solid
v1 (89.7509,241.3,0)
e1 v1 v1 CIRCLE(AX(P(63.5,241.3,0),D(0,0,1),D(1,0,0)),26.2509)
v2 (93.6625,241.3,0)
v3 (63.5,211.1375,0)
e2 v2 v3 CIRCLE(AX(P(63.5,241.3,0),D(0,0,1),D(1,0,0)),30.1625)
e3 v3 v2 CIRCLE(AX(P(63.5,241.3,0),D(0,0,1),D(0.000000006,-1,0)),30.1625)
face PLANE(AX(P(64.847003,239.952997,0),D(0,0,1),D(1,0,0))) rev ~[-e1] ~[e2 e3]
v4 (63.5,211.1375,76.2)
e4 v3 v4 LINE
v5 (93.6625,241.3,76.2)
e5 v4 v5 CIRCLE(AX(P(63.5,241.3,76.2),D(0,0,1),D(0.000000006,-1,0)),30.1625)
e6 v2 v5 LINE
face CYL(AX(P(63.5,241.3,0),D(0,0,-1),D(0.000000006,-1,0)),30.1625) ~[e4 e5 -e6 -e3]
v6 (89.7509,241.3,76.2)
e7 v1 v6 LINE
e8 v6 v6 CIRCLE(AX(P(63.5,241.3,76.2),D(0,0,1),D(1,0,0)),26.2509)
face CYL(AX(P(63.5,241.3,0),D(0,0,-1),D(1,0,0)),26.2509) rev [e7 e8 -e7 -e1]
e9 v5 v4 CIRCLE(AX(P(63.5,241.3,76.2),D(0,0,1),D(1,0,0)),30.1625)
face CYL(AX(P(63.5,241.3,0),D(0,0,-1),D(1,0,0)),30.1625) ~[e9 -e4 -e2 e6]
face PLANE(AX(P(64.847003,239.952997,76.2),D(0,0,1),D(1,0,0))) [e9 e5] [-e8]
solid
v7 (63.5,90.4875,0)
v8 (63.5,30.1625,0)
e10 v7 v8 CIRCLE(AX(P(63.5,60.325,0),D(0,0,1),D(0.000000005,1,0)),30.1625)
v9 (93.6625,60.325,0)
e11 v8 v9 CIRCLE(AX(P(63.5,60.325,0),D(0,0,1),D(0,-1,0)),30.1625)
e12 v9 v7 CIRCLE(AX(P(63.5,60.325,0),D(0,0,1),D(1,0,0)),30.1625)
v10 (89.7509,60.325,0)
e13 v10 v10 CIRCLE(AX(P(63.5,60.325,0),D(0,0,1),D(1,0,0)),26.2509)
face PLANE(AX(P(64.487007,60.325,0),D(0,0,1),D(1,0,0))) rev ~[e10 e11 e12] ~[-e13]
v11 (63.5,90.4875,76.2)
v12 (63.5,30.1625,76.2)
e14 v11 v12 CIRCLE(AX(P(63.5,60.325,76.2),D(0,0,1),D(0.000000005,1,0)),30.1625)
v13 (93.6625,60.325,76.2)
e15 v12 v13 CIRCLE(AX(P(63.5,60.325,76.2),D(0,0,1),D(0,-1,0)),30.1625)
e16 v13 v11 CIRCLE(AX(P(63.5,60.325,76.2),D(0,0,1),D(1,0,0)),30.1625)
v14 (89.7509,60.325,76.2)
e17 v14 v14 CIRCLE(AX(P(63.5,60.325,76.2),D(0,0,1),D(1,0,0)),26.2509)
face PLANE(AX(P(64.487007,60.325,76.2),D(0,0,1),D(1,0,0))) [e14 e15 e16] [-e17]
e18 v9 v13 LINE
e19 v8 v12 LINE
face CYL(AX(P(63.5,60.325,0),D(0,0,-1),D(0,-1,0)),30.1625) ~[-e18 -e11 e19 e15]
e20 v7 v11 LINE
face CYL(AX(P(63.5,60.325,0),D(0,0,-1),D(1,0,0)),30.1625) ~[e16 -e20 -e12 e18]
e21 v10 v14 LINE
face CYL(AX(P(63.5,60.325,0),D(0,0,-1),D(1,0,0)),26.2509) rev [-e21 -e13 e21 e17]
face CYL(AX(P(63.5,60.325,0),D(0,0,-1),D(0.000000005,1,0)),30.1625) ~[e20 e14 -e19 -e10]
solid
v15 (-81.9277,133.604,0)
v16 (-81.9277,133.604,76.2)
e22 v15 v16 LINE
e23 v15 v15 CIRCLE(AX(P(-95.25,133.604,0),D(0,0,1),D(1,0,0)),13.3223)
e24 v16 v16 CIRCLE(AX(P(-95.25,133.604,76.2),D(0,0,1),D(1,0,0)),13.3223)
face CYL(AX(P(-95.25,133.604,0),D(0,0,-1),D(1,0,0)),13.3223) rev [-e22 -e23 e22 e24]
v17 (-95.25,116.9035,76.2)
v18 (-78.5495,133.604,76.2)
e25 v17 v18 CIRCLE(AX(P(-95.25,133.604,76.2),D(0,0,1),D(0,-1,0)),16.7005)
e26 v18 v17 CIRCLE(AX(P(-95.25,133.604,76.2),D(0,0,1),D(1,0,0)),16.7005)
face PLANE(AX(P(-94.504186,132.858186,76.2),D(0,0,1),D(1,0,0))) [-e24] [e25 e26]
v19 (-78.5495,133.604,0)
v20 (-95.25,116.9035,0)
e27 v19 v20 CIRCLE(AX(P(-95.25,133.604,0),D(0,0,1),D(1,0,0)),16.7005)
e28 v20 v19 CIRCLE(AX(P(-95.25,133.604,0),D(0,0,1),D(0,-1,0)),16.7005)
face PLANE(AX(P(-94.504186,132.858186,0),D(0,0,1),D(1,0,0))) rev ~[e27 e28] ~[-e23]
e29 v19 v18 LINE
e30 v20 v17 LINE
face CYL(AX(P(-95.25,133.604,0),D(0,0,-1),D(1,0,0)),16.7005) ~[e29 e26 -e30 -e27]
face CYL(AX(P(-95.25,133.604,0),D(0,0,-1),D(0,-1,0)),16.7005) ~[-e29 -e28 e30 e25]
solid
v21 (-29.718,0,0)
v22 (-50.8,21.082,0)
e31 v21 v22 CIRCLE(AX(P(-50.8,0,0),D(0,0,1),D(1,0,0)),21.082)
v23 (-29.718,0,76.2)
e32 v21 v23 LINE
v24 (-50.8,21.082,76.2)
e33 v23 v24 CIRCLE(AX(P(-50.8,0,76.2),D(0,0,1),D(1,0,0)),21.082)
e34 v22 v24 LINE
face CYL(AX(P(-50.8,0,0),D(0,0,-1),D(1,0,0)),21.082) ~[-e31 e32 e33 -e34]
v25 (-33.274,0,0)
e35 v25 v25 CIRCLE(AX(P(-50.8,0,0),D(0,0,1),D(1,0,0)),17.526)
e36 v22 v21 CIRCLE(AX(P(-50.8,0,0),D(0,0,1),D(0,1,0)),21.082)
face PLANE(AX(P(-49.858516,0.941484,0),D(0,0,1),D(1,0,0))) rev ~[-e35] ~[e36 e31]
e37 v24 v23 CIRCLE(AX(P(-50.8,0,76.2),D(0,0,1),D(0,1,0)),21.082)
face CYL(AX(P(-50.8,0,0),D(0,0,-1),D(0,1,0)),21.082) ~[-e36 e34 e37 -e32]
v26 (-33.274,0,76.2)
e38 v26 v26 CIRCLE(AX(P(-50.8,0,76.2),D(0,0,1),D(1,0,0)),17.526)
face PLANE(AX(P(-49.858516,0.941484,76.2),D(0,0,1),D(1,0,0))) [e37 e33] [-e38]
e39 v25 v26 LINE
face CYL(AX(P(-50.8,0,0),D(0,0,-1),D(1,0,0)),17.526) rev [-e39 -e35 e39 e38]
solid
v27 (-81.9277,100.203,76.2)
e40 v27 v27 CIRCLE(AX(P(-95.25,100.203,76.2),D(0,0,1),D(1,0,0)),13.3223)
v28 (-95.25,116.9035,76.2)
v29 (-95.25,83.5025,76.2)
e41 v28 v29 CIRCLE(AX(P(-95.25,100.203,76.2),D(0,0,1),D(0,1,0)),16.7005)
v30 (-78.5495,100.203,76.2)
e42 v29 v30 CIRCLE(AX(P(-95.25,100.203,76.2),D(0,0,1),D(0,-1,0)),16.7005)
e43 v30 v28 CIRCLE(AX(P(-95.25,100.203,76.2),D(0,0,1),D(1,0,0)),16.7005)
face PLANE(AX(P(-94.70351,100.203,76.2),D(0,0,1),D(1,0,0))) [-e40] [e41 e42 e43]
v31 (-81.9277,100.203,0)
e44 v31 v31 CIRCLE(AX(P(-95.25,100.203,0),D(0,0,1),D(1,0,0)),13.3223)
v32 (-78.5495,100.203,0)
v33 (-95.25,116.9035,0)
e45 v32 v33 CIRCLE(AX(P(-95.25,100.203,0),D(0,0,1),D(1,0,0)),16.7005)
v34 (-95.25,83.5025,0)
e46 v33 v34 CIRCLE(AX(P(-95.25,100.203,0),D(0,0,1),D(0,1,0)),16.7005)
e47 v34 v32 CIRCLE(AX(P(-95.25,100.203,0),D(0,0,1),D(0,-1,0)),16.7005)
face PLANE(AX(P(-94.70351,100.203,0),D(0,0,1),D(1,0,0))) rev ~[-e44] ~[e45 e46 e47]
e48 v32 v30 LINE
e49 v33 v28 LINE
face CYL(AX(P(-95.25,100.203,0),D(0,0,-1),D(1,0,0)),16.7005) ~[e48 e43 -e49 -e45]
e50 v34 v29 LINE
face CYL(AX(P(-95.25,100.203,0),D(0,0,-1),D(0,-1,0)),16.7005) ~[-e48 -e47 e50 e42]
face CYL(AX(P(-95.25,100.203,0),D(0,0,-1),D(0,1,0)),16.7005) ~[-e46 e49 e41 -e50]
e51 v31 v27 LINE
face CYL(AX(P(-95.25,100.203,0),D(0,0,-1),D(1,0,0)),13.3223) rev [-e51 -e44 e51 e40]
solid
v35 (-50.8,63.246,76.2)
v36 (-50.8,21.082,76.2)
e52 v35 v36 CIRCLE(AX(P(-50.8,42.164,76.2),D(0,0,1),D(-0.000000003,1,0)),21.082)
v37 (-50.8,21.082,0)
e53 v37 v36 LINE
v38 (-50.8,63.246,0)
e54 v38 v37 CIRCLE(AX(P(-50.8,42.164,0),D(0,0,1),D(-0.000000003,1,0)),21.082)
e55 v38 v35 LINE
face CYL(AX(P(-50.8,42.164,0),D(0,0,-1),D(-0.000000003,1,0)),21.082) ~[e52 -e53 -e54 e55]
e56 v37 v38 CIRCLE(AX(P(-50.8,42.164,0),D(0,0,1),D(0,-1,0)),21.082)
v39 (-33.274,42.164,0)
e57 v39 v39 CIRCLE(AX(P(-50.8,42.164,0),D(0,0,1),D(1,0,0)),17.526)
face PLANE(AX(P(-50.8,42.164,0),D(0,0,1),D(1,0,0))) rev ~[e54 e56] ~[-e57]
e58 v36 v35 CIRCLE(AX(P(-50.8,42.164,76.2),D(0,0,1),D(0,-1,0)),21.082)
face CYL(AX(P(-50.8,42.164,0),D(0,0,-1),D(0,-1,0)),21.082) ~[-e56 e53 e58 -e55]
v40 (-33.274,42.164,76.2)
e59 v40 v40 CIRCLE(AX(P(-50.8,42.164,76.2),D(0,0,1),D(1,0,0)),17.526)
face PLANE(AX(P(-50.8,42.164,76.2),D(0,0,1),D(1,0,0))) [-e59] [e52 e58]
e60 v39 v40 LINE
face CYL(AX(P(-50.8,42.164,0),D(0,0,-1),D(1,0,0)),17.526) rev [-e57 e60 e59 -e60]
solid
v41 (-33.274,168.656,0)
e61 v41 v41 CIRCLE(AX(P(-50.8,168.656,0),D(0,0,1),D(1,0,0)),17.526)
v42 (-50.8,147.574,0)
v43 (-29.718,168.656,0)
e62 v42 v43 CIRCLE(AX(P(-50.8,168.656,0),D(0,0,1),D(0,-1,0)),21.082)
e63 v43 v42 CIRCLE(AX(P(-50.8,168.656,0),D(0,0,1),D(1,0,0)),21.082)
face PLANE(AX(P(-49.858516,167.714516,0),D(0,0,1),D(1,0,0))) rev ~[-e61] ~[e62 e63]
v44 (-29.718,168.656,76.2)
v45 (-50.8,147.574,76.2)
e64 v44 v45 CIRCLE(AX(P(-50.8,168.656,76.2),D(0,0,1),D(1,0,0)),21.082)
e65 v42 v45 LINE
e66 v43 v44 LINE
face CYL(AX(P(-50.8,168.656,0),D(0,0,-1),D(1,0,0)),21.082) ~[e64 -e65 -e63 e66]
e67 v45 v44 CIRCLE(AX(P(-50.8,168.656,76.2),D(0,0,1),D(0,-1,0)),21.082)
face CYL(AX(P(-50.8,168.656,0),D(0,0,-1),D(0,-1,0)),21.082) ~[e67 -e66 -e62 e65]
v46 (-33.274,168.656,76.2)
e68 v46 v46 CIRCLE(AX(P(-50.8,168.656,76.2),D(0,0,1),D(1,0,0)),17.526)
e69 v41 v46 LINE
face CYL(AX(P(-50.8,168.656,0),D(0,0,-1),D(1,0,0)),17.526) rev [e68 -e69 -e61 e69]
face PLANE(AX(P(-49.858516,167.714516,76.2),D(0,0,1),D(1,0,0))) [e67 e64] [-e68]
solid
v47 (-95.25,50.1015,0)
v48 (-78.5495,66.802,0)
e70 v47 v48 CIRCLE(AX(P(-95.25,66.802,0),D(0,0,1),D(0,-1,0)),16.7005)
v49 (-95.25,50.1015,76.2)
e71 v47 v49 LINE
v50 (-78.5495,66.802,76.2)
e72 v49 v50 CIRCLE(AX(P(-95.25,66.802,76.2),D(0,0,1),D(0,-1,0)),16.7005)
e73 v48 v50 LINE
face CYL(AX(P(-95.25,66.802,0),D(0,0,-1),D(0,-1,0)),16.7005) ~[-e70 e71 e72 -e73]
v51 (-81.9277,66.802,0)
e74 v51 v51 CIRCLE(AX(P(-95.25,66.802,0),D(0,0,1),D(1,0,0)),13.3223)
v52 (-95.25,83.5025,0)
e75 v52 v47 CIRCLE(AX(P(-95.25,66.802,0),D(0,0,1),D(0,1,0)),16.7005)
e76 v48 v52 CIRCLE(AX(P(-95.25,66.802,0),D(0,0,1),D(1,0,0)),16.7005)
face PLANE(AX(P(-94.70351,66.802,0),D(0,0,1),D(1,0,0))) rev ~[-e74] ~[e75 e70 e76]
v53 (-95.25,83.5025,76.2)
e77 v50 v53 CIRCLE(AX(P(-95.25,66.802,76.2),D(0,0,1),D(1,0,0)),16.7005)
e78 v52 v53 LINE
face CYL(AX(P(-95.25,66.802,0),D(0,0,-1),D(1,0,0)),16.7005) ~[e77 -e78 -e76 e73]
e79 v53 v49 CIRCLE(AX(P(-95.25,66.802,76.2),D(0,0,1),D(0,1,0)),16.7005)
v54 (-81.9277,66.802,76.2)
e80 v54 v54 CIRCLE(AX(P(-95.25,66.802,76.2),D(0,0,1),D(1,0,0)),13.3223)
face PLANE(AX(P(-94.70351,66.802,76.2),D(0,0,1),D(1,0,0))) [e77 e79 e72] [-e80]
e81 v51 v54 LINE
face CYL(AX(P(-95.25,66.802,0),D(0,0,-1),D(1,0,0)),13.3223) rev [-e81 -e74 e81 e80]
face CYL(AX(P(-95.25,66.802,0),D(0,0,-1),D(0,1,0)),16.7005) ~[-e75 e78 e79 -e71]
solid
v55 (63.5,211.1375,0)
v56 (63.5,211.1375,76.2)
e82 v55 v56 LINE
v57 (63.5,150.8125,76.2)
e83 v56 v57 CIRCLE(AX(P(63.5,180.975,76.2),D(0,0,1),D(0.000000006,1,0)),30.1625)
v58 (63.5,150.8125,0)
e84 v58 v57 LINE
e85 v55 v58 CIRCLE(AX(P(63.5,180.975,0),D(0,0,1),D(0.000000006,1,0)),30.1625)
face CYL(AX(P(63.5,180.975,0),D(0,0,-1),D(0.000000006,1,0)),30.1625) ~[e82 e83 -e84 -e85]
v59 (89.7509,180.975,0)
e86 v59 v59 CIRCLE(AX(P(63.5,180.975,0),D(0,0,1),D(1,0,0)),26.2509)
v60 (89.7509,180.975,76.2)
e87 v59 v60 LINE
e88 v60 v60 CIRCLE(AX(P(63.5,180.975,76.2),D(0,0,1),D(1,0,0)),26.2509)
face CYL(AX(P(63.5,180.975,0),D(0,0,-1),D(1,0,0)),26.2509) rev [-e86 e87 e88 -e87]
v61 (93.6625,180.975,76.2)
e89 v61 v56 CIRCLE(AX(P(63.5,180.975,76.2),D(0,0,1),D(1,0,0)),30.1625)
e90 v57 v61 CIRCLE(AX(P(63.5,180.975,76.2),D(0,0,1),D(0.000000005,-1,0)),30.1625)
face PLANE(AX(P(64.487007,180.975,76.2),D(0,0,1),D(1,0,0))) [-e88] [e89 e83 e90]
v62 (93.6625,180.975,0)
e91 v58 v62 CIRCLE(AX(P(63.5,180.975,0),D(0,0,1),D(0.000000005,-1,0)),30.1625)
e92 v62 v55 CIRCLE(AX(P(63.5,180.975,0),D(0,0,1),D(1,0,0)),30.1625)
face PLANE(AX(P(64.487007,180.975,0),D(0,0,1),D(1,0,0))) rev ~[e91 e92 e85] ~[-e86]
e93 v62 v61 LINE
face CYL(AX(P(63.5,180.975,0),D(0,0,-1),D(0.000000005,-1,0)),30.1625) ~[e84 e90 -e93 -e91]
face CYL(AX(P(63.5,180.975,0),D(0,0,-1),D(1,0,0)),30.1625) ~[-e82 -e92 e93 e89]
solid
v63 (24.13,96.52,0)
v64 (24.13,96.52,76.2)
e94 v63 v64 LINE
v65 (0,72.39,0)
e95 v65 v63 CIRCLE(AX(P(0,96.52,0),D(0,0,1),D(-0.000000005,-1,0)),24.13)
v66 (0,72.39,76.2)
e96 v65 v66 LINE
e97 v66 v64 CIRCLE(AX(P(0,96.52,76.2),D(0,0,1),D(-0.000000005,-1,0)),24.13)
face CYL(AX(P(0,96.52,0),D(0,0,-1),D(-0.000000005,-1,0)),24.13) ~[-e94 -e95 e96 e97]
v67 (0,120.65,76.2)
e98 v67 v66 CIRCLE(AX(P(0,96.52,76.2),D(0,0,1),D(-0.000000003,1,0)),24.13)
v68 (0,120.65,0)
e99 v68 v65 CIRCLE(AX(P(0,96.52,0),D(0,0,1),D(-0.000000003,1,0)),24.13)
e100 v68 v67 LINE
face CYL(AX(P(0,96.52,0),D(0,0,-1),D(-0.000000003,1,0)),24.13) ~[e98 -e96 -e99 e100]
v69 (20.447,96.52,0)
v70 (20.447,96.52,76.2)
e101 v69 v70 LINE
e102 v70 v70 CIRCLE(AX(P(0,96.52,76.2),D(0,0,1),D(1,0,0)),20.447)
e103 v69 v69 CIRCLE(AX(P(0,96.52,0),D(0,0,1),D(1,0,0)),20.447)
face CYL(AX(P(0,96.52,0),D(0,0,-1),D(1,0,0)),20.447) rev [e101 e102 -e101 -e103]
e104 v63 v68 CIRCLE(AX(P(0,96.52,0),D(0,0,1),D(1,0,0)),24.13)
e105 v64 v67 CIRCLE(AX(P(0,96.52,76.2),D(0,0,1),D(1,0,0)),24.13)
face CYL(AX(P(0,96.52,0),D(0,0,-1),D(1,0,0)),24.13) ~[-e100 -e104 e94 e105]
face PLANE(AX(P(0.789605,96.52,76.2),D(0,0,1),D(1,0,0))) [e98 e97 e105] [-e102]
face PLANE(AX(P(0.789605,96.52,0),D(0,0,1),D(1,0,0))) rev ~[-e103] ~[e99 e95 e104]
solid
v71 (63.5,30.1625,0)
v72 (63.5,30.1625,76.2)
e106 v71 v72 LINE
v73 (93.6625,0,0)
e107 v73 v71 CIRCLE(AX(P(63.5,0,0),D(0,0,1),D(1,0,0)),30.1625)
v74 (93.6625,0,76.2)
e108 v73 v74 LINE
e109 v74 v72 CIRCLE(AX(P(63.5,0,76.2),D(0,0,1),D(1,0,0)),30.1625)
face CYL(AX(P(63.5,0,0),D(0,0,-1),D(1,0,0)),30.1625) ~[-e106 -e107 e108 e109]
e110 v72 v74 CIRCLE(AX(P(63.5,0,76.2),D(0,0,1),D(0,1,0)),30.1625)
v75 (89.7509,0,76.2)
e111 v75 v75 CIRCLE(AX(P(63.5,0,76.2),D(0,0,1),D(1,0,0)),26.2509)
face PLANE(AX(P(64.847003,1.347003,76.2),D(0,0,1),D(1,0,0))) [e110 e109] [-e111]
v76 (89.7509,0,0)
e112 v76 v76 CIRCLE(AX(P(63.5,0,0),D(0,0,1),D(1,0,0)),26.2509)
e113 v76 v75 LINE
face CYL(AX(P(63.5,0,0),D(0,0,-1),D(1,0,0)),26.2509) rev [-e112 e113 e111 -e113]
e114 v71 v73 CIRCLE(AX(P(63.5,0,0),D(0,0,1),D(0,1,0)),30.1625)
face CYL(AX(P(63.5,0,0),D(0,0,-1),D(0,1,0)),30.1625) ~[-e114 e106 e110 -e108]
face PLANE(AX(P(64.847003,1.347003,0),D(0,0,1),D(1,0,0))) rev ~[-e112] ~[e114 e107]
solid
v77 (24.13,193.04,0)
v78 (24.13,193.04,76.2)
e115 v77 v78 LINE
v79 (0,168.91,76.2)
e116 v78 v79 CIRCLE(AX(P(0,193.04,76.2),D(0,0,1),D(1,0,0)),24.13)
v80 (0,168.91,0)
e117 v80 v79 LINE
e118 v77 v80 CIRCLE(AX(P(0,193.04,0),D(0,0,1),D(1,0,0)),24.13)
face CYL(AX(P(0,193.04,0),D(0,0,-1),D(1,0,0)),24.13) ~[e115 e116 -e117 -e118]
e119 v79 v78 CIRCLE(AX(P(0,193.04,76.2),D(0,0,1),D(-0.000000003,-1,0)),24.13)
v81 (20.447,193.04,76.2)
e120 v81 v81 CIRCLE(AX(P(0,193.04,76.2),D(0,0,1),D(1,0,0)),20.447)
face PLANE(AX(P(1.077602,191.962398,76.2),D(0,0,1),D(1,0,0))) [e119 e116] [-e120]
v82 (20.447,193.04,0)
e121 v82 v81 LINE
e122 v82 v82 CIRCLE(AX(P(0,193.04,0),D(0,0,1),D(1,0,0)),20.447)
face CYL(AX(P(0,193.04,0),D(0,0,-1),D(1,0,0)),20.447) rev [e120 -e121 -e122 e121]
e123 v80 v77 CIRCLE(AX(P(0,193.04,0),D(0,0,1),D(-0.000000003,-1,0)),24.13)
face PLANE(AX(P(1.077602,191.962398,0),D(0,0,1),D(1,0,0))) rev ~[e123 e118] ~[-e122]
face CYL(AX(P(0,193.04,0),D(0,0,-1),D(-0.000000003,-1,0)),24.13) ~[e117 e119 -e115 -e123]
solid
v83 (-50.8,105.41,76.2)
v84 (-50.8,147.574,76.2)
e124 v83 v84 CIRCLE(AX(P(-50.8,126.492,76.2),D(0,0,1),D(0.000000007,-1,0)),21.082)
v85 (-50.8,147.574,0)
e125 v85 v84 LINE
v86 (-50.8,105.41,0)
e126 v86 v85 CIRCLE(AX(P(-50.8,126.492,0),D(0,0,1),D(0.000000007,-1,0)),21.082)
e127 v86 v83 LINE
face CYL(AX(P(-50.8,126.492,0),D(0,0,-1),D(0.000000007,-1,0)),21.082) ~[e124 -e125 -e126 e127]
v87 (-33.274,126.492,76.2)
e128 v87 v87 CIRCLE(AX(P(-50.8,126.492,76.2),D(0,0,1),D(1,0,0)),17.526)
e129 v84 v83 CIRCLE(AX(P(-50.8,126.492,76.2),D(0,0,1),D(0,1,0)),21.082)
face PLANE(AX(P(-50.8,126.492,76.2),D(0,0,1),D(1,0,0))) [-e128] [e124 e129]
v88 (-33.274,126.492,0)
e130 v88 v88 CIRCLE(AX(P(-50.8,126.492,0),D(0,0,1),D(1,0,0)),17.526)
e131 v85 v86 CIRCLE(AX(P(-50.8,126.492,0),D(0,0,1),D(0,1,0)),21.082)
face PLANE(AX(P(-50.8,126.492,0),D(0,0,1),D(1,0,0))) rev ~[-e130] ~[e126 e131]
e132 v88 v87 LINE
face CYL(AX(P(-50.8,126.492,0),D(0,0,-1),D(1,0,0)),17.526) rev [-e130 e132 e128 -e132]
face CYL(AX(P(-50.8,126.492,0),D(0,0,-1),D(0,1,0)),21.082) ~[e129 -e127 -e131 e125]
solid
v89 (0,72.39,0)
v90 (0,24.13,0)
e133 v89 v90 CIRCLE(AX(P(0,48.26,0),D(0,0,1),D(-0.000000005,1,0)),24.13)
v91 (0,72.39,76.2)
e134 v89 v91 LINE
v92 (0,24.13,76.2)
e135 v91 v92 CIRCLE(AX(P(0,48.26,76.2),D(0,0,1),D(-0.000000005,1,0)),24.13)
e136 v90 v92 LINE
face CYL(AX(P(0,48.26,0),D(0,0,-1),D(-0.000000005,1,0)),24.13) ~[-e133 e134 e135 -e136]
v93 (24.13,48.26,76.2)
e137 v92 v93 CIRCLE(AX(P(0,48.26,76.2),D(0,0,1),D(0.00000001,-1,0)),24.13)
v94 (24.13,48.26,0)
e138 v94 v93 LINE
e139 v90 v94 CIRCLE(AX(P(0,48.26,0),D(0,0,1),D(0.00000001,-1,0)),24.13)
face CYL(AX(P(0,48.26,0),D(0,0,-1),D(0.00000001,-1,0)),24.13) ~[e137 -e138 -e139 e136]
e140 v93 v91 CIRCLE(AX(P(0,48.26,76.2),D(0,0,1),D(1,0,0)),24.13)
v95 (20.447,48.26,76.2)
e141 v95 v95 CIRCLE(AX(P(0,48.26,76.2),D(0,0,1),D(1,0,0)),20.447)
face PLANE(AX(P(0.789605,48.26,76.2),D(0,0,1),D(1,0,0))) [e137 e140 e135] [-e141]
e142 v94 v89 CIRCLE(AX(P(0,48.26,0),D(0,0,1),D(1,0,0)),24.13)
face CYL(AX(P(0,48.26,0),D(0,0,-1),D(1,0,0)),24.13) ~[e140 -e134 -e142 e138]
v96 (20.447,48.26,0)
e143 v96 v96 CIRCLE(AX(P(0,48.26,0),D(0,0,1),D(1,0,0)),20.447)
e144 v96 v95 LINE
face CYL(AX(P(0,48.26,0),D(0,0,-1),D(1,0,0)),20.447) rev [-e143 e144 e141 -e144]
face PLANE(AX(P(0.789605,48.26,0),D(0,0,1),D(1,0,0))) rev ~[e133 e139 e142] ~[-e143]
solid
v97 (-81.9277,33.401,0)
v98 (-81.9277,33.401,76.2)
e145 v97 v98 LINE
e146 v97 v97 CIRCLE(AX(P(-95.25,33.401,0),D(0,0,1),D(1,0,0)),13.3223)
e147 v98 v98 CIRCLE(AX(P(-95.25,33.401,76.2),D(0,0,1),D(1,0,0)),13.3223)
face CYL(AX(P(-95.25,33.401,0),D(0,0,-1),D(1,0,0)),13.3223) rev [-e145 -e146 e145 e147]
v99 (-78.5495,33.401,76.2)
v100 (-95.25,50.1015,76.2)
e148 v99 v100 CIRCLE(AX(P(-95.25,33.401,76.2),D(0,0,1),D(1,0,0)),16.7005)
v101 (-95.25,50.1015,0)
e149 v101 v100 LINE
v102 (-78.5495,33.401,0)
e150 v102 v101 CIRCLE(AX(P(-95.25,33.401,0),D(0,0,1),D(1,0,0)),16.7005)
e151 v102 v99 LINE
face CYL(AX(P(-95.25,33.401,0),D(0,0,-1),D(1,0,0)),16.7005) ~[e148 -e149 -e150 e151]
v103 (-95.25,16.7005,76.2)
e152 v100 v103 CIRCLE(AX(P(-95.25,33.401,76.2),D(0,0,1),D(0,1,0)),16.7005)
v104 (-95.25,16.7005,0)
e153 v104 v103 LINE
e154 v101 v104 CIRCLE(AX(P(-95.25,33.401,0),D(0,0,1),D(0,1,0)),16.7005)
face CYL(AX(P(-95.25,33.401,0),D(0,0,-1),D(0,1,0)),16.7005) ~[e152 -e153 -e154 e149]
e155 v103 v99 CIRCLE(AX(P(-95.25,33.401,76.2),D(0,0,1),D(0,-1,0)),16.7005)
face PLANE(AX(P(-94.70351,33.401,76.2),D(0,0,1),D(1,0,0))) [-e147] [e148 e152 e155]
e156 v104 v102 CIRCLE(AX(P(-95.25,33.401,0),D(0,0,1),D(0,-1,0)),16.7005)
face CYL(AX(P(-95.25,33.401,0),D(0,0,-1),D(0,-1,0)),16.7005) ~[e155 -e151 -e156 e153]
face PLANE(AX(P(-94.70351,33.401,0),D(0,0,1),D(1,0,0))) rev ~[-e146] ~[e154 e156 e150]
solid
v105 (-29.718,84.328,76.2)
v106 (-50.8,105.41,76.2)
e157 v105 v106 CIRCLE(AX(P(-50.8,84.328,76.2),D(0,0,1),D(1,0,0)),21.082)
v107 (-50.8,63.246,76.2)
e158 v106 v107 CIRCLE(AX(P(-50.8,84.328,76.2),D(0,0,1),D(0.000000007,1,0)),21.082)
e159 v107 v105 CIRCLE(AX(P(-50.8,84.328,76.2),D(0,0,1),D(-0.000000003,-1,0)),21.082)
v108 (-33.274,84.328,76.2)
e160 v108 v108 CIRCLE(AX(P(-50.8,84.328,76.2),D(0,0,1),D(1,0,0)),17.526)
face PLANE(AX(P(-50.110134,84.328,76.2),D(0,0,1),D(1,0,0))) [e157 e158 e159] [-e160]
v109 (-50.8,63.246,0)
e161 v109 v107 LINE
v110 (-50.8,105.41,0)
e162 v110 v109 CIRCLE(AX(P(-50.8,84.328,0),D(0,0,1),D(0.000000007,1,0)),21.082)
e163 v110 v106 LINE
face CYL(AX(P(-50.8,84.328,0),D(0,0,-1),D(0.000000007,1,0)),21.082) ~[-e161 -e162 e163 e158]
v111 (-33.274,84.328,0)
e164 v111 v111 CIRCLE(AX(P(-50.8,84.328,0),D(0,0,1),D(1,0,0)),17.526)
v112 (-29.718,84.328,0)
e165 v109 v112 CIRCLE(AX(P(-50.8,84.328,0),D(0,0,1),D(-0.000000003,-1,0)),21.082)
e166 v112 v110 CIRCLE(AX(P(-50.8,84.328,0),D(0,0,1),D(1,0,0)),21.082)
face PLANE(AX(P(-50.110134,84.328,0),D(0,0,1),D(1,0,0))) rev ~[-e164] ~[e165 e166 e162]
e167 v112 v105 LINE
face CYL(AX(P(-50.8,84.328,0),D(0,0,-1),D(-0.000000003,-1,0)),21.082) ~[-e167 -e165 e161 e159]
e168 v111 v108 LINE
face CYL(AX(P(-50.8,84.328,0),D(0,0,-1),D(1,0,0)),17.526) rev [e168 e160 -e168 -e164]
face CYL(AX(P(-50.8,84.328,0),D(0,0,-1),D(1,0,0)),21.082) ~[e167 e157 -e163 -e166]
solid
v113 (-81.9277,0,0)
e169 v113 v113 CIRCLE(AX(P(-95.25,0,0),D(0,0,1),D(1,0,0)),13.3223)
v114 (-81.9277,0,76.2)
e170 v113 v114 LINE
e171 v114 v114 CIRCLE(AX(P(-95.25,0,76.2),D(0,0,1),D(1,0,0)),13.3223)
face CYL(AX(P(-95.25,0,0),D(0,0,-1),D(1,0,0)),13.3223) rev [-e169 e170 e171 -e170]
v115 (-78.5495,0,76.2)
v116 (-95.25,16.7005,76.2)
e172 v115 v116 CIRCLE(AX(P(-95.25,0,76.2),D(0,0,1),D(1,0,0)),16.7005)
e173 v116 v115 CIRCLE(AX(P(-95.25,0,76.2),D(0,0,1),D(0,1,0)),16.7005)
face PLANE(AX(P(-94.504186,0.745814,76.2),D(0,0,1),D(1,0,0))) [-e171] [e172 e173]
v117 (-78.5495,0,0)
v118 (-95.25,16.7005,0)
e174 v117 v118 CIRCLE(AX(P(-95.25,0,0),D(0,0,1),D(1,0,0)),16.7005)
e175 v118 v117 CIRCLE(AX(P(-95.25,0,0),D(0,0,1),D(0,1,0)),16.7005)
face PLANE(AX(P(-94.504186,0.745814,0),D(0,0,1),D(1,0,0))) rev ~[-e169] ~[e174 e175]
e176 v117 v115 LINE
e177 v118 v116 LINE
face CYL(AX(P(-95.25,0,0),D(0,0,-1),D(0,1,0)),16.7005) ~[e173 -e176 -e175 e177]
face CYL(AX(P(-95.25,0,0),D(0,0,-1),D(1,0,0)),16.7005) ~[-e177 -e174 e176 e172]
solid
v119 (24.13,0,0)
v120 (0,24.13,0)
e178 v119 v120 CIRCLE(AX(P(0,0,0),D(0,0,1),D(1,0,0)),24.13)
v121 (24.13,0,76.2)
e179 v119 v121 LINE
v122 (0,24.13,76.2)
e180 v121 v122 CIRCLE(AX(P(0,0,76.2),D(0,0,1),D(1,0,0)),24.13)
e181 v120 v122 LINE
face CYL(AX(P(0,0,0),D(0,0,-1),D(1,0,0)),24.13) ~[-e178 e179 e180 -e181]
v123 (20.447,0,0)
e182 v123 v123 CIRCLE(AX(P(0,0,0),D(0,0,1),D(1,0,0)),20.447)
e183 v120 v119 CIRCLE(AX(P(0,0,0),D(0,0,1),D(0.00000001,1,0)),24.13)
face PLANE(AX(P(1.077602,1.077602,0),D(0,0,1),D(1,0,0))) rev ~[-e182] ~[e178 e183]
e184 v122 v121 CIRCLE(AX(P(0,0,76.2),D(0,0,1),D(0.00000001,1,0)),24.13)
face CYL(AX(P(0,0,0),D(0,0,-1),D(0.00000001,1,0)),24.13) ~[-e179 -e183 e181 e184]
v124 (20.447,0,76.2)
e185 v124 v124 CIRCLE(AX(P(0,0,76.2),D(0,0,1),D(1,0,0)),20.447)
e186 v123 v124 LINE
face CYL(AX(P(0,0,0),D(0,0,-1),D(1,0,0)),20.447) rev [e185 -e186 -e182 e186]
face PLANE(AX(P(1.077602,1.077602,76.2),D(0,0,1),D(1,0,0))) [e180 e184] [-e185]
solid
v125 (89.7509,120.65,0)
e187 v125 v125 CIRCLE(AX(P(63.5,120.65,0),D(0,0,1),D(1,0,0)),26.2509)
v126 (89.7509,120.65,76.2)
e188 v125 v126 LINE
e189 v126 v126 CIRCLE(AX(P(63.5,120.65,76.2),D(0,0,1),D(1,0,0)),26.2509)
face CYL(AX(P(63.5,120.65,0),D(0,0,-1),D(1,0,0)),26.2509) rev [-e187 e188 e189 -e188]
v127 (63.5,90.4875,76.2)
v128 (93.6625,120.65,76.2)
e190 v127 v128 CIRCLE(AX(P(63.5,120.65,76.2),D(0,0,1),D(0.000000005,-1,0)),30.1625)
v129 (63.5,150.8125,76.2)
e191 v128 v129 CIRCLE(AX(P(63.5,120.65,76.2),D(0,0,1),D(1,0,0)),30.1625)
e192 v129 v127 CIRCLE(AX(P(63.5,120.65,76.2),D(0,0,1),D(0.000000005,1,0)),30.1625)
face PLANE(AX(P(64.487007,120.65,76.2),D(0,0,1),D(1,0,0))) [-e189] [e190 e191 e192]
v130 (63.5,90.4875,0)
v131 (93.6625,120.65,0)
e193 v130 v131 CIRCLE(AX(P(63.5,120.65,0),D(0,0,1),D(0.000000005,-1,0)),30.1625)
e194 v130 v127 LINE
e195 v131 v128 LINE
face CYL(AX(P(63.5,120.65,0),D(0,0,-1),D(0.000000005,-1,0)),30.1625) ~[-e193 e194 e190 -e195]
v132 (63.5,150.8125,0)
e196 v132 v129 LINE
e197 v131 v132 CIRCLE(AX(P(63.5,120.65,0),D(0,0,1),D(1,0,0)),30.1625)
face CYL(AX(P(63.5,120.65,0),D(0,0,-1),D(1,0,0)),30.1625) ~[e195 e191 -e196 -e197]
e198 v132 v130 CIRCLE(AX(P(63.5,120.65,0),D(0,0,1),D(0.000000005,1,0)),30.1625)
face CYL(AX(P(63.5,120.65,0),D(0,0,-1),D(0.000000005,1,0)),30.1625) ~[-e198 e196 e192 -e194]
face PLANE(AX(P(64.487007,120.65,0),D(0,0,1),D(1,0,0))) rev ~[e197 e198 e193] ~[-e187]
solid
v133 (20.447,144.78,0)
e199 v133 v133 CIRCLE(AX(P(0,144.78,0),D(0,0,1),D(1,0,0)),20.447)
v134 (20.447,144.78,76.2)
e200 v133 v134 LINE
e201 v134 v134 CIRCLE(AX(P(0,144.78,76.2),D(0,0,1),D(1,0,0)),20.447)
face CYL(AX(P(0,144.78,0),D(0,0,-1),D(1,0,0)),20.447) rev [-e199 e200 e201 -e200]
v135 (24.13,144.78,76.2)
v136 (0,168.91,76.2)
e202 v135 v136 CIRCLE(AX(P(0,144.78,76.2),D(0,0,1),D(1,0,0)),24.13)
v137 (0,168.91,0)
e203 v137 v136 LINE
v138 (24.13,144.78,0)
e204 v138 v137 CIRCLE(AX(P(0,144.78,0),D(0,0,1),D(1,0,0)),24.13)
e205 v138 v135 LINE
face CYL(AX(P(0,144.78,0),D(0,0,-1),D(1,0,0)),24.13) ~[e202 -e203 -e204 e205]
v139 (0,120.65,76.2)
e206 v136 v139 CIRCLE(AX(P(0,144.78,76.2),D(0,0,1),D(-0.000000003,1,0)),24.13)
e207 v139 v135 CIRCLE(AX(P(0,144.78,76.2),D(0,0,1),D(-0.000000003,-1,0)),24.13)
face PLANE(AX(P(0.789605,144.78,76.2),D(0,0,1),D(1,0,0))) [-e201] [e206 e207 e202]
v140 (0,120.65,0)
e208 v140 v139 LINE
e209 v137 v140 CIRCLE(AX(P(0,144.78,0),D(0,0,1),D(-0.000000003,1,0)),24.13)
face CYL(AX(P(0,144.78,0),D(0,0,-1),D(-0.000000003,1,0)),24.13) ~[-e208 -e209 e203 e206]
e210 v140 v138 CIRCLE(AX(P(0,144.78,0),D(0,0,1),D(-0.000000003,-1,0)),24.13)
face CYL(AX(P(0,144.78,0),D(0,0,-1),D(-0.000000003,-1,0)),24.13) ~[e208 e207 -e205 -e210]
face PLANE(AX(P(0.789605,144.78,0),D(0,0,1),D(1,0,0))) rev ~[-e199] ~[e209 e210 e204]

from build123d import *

# Parameters (mm, degrees)
F5_R     = 20.447
F6_DEPTH = 76.2
F5_R_2   = 26.2509
F5_R_3   = 17.526
F5_R_4   = 13.3223


# Not quite as in the source:
# - a variable given as a bare number and used for a length is read in inches; the dataset says mm whatever the document's units were
# - the program builds the solid bodies; features that only make, move or delete a surface that nothing else refers to are left out


with BuildPart() as f6:
    # F5 (on Top) → F6 (new body)
    with BuildSketch(Plane.XY):
        with BuildLine():
            ThreePointArc((2.415e-07, 24.13), (-17.0624867154, -17.0624865447), (24.13, 0))
            ThreePointArc((24.13, 0), (17.0624867154, 17.0624865447), (2.415e-07, 24.13))
        make_face()
        Circle(F5_R, mode=Mode.SUBTRACT)
    extrude(amount=F6_DEPTH)


with BuildPart() as f6b:
    # F5 (on Top) → F6, piece 2 (new body)
    with BuildSketch(Plane.XY):
        with BuildLine():
            ThreePointArc((24.13, 193.04), (-17.0624866044, 210.1024866557), (-7.25e-08, 168.91))
            ThreePointArc((-7.25e-08, 168.91), (17.0624866044, 175.9775133443), (24.13, 193.04))
        make_face()
        with Locations((0, 193.04)):
            Circle(F5_R, mode=Mode.SUBTRACT)
    extrude(amount=F6_DEPTH)


with BuildPart() as f6c:
    # F5 (on Top) → F6, piece 3 (new body)
    with BuildSketch(Plane.XY):
        with BuildLine():
            ThreePointArc((-7.25e-08, 168.91), (-24.13, 144.7800000021), (-7.68e-08, 120.65))
            ThreePointArc((-7.68e-08, 120.65), (17.0624866029, 127.7175133428), (24.13, 144.78))
            ThreePointArc((24.13, 144.78), (17.0624866044, 161.8424866557), (-7.25e-08, 168.91))
        make_face()
        with Locations((0, 144.78)):
            Circle(F5_R, mode=Mode.SUBTRACT)
    extrude(amount=F6_DEPTH)


with BuildPart() as f6d:
    # F5 (on Top) → F6, piece 4 (new body)
    with BuildSketch(Plane.XY):
        with BuildLine():
            ThreePointArc((-7.68e-08, 120.65), (-24.13, 96.5200000237), (-1.242e-07, 72.39))
            ThreePointArc((-1.242e-07, 72.39), (17.0624865861, 79.4575133261), (24.13, 96.52))
            ThreePointArc((24.13, 96.52), (17.0624866029, 113.5824866572), (-7.68e-08, 120.65))
        make_face()
        with Locations((0, 96.52)):
            Circle(F5_R, mode=Mode.SUBTRACT)
    extrude(amount=F6_DEPTH)


with BuildPart() as f6e:
    # F5 (on Top) → F6, piece 5 (new body)
    with BuildSketch(Plane.XY):
        with BuildLine():
            ThreePointArc((-1.242e-07, 72.39), (-24.13, 48.2599998172), (2.415e-07, 24.13))
            ThreePointArc((2.415e-07, 24.13), (17.0624867154, 31.1975134553), (24.13, 48.26))
            ThreePointArc((24.13, 48.26), (17.0624865861, 65.3224866739), (-1.242e-07, 72.39))
        make_face()
        with Locations((0, 48.26)):
            Circle(F5_R, mode=Mode.SUBTRACT)
    extrude(amount=F6_DEPTH)


with BuildPart() as f6f:
    # F5 (on Top) → F6, piece 6 (new body)
    with BuildSketch(Plane.XY):
        with BuildLine():
            ThreePointArc((63.5, 30.1625), (42.1718917125, -21.3281082875), (93.6625, 0))
            ThreePointArc((93.6625, 0), (84.8281082875, 21.3281082875), (63.5, 30.1625))
        make_face()
        with Locations((63.5, 0)):
            Circle(F5_R_2, mode=Mode.SUBTRACT)
    extrude(amount=F6_DEPTH)


with BuildPart() as f6g:
    # F5 (on Top) → F6, piece 7 (new body)
    with BuildSketch(Plane.XY):
        with BuildLine():
            ThreePointArc((93.6625, 241.3), (42.1718916511, 262.6281082262), (63.5000001735, 211.1375))
            ThreePointArc((63.5000001735, 211.1375), (84.8281083489, 219.9718917738), (93.6625, 241.3))
        make_face()
        with Locations((63.5, 241.3)):
            Circle(F5_R_2, mode=Mode.SUBTRACT)
    extrude(amount=F6_DEPTH)


with BuildPart() as f6h:
    # F5 (on Top) → F6, piece 8 (new body)
    with BuildSketch(Plane.XY):
        with BuildLine():
            ThreePointArc((63.5000001735, 211.1375), (33.3375, 180.9750000105), (63.5000001525, 150.8125))
            ThreePointArc((63.5000001525, 150.8125), (84.8281083415, 159.6468917664), (93.6625, 180.975))
            ThreePointArc((93.6625, 180.975), (84.8281083489, 202.3031082262), (63.5000001735, 211.1375))
        make_face()
        with Locations((63.5, 180.975)):
            Circle(F5_R_2, mode=Mode.SUBTRACT)
    extrude(amount=F6_DEPTH)


with BuildPart() as f6i:
    # F5 (on Top) → F6, piece 9 (new body)
    with BuildSketch(Plane.XY):
        with BuildLine():
            ThreePointArc((63.5000001525, 150.8125), (33.3375, 120.6500000068), (63.5000001389, 90.4875))
            ThreePointArc((63.5000001389, 90.4875), (84.8281083366, 99.3218917616), (93.6625, 120.65))
            ThreePointArc((93.6625, 120.65), (84.8281083415, 141.9781082336), (63.5000001525, 150.8125))
        make_face()
        with Locations((63.5, 120.65)):
            Circle(F5_R_2, mode=Mode.SUBTRACT)
    extrude(amount=F6_DEPTH)


with BuildPart() as f6j:
    # F5 (on Top) → F6, piece 10 (new body)
    with BuildSketch(Plane.XY):
        with BuildLine():
            ThreePointArc((63.5000001389, 90.4875), (33.3375, 60.3250000694), (63.5, 30.1625))
            ThreePointArc((63.5, 30.1625), (84.8281082875, 38.9968917125), (93.6625, 60.325))
            ThreePointArc((93.6625, 60.325), (84.8281083366, 81.6531082384), (63.5000001389, 90.4875))
        make_face()
        with Locations((63.5, 60.325)):
            Circle(F5_R_2, mode=Mode.SUBTRACT)
    extrude(amount=F6_DEPTH)


with BuildPart() as f6k:
    # F5 (on Top) → F6, piece 11 (new body)
    with BuildSketch(Plane.XY):
        with BuildLine():
            ThreePointArc((-50.8, 21.082), (-65.707225161, -14.907225161), (-29.718, 0))
            ThreePointArc((-29.718, 0), (-35.892774839, 14.907225161), (-50.8, 21.082))
        make_face()
        with Locations((-50.8, 0)):
            Circle(F5_R_3, mode=Mode.SUBTRACT)
    extrude(amount=F6_DEPTH)


with BuildPart() as f6l:
    # F5 (on Top) → F6, piece 12 (new body)
    with BuildSketch(Plane.XY):
        with BuildLine():
            ThreePointArc((-29.718, 168.656), (-65.707225161, 183.563225161), (-50.8, 147.574))
            ThreePointArc((-50.8, 147.574), (-35.892774839, 153.748774839), (-29.718, 168.656))
        make_face()
        with Locations((-50.8, 168.656)):
            Circle(F5_R_3, mode=Mode.SUBTRACT)
    extrude(amount=F6_DEPTH)


with BuildPart() as f6m:
    # F5 (on Top) → F6, piece 13 (new body)
    with BuildSketch(Plane.XY):
        with BuildLine():
            ThreePointArc((-50.8, 147.574), (-71.882, 126.4919999282), (-50.7999998565, 105.41))
            ThreePointArc((-50.7999998565, 105.41), (-35.8927747883, 111.5847748898), (-29.718, 126.492))
            ThreePointArc((-29.718, 126.492), (-35.892774839, 141.399225161), (-50.8, 147.574))
        make_face()
        with Locations((-50.8, 126.492)):
            Circle(F5_R_3, mode=Mode.SUBTRACT)
    extrude(amount=F6_DEPTH)


with BuildPart() as f6n:
    # F5 (on Top) → F6, piece 14 (new body)
    with BuildSketch(Plane.XY):
        with BuildLine():
            ThreePointArc((-50.7999998565, 105.41), (-71.882, 84.3280001019), (-50.8000000603, 63.246))
            ThreePointArc((-50.8000000603, 63.246), (-35.8927748604, 69.4207748177), (-29.718, 84.328))
            ThreePointArc((-29.718, 84.328), (-35.8927747883, 99.2352251102), (-50.7999998565, 105.41))
        make_face()
        with Locations((-50.8, 84.328)):
            Circle(F5_R_3, mode=Mode.SUBTRACT)
    extrude(amount=F6_DEPTH)


with BuildPart() as f6o:
    # F5 (on Top) → F6, piece 15 (new body)
    with BuildSketch(Plane.XY):
        with BuildLine():
            ThreePointArc((-50.8000000603, 63.246), (-71.882, 42.1639999698), (-50.8, 21.082))
            ThreePointArc((-50.8, 21.082), (-35.892774839, 27.256774839), (-29.718, 42.164))
            ThreePointArc((-29.718, 42.164), (-35.8927748604, 57.0712251823), (-50.8000000603, 63.246))
        make_face()
        with Locations((-50.8, 42.164)):
            Circle(F5_R_3, mode=Mode.SUBTRACT)
    extrude(amount=F6_DEPTH)


with BuildPart() as f6p:
    # F5 (on Top) → F6, piece 16 (new body)
    with BuildSketch(Plane.XY):
        with BuildLine():
            ThreePointArc((-95.25, 16.7005), (-107.0590367992, -11.8090367992), (-78.5495, 0))
            ThreePointArc((-78.5495, 0), (-83.4409632008, 11.8090367992), (-95.25, 16.7005))
        make_face()
        with Locations((-95.25, 0)):
            Circle(F5_R_4, mode=Mode.SUBTRACT)
    extrude(amount=F6_DEPTH)


with BuildPart() as f6q:
    # F5 (on Top) → F6, piece 17 (new body)
    with BuildSketch(Plane.XY):
        with BuildLine():
            ThreePointArc((-78.5495, 133.604), (-107.0590367992, 145.4130367992), (-95.25, 116.9035))
            ThreePointArc((-95.25, 116.9035), (-83.4409632008, 121.7949632008), (-78.5495, 133.604))
        make_face()
        with Locations((-95.25, 133.604)):
            Circle(F5_R_4, mode=Mode.SUBTRACT)
    extrude(amount=F6_DEPTH)


with BuildPart() as f6r:
    # F5 (on Top) → F6, piece 18 (new body)
    with BuildSketch(Plane.XY):
        with BuildLine():
            ThreePointArc((-95.25, 116.9035), (-111.9505, 100.203), (-95.25, 83.5025))
            ThreePointArc((-95.25, 83.5025), (-83.4409632008, 88.3939632008), (-78.5495, 100.203))
            ThreePointArc((-78.5495, 100.203), (-83.4409632008, 112.0120367992), (-95.25, 116.9035))
        make_face()
        with Locations((-95.25, 100.203)):
            Circle(F5_R_4, mode=Mode.SUBTRACT)
    extrude(amount=F6_DEPTH)


with BuildPart() as f6s:
    # F5 (on Top) → F6, piece 19 (new body)
    with BuildSketch(Plane.XY):
        with BuildLine():
            ThreePointArc((-95.25, 83.5025), (-111.9505, 66.802), (-95.25, 50.1015))
            ThreePointArc((-95.25, 50.1015), (-83.4409632008, 54.9929632008), (-78.5495, 66.802))
            ThreePointArc((-78.5495, 66.802), (-83.4409632008, 78.6110367992), (-95.25, 83.5025))
        make_face()
        with Locations((-95.25, 66.802)):
            Circle(F5_R_4, mode=Mode.SUBTRACT)
    extrude(amount=F6_DEPTH)


with BuildPart() as f6t:
    # F5 (on Top) → F6, piece 20 (new body)
    with BuildSketch(Plane.XY):
        with BuildLine():
            ThreePointArc((-95.25, 50.1015), (-111.9505, 33.401), (-95.25, 16.7005))
            ThreePointArc((-95.25, 16.7005), (-83.4409632008, 21.5919632008), (-78.5495, 33.401))
            ThreePointArc((-78.5495, 33.401), (-83.4409632008, 45.2100367992), (-95.25, 50.1015))
        make_face()
        with Locations((-95.25, 33.401)):
            Circle(F5_R_4, mode=Mode.SUBTRACT)
    extrude(amount=F6_DEPTH)


solid = Compound([f6.part, f6b.part, f6c.part, f6d.part, f6e.part, f6f.part, f6g.part, f6h.part, f6i.part, f6j.part, f6k.part, f6l.part, f6m.part, f6n.part, f6o.part, f6p.part, f6q.part, f6r.part, f6s.part, f6t.part])
